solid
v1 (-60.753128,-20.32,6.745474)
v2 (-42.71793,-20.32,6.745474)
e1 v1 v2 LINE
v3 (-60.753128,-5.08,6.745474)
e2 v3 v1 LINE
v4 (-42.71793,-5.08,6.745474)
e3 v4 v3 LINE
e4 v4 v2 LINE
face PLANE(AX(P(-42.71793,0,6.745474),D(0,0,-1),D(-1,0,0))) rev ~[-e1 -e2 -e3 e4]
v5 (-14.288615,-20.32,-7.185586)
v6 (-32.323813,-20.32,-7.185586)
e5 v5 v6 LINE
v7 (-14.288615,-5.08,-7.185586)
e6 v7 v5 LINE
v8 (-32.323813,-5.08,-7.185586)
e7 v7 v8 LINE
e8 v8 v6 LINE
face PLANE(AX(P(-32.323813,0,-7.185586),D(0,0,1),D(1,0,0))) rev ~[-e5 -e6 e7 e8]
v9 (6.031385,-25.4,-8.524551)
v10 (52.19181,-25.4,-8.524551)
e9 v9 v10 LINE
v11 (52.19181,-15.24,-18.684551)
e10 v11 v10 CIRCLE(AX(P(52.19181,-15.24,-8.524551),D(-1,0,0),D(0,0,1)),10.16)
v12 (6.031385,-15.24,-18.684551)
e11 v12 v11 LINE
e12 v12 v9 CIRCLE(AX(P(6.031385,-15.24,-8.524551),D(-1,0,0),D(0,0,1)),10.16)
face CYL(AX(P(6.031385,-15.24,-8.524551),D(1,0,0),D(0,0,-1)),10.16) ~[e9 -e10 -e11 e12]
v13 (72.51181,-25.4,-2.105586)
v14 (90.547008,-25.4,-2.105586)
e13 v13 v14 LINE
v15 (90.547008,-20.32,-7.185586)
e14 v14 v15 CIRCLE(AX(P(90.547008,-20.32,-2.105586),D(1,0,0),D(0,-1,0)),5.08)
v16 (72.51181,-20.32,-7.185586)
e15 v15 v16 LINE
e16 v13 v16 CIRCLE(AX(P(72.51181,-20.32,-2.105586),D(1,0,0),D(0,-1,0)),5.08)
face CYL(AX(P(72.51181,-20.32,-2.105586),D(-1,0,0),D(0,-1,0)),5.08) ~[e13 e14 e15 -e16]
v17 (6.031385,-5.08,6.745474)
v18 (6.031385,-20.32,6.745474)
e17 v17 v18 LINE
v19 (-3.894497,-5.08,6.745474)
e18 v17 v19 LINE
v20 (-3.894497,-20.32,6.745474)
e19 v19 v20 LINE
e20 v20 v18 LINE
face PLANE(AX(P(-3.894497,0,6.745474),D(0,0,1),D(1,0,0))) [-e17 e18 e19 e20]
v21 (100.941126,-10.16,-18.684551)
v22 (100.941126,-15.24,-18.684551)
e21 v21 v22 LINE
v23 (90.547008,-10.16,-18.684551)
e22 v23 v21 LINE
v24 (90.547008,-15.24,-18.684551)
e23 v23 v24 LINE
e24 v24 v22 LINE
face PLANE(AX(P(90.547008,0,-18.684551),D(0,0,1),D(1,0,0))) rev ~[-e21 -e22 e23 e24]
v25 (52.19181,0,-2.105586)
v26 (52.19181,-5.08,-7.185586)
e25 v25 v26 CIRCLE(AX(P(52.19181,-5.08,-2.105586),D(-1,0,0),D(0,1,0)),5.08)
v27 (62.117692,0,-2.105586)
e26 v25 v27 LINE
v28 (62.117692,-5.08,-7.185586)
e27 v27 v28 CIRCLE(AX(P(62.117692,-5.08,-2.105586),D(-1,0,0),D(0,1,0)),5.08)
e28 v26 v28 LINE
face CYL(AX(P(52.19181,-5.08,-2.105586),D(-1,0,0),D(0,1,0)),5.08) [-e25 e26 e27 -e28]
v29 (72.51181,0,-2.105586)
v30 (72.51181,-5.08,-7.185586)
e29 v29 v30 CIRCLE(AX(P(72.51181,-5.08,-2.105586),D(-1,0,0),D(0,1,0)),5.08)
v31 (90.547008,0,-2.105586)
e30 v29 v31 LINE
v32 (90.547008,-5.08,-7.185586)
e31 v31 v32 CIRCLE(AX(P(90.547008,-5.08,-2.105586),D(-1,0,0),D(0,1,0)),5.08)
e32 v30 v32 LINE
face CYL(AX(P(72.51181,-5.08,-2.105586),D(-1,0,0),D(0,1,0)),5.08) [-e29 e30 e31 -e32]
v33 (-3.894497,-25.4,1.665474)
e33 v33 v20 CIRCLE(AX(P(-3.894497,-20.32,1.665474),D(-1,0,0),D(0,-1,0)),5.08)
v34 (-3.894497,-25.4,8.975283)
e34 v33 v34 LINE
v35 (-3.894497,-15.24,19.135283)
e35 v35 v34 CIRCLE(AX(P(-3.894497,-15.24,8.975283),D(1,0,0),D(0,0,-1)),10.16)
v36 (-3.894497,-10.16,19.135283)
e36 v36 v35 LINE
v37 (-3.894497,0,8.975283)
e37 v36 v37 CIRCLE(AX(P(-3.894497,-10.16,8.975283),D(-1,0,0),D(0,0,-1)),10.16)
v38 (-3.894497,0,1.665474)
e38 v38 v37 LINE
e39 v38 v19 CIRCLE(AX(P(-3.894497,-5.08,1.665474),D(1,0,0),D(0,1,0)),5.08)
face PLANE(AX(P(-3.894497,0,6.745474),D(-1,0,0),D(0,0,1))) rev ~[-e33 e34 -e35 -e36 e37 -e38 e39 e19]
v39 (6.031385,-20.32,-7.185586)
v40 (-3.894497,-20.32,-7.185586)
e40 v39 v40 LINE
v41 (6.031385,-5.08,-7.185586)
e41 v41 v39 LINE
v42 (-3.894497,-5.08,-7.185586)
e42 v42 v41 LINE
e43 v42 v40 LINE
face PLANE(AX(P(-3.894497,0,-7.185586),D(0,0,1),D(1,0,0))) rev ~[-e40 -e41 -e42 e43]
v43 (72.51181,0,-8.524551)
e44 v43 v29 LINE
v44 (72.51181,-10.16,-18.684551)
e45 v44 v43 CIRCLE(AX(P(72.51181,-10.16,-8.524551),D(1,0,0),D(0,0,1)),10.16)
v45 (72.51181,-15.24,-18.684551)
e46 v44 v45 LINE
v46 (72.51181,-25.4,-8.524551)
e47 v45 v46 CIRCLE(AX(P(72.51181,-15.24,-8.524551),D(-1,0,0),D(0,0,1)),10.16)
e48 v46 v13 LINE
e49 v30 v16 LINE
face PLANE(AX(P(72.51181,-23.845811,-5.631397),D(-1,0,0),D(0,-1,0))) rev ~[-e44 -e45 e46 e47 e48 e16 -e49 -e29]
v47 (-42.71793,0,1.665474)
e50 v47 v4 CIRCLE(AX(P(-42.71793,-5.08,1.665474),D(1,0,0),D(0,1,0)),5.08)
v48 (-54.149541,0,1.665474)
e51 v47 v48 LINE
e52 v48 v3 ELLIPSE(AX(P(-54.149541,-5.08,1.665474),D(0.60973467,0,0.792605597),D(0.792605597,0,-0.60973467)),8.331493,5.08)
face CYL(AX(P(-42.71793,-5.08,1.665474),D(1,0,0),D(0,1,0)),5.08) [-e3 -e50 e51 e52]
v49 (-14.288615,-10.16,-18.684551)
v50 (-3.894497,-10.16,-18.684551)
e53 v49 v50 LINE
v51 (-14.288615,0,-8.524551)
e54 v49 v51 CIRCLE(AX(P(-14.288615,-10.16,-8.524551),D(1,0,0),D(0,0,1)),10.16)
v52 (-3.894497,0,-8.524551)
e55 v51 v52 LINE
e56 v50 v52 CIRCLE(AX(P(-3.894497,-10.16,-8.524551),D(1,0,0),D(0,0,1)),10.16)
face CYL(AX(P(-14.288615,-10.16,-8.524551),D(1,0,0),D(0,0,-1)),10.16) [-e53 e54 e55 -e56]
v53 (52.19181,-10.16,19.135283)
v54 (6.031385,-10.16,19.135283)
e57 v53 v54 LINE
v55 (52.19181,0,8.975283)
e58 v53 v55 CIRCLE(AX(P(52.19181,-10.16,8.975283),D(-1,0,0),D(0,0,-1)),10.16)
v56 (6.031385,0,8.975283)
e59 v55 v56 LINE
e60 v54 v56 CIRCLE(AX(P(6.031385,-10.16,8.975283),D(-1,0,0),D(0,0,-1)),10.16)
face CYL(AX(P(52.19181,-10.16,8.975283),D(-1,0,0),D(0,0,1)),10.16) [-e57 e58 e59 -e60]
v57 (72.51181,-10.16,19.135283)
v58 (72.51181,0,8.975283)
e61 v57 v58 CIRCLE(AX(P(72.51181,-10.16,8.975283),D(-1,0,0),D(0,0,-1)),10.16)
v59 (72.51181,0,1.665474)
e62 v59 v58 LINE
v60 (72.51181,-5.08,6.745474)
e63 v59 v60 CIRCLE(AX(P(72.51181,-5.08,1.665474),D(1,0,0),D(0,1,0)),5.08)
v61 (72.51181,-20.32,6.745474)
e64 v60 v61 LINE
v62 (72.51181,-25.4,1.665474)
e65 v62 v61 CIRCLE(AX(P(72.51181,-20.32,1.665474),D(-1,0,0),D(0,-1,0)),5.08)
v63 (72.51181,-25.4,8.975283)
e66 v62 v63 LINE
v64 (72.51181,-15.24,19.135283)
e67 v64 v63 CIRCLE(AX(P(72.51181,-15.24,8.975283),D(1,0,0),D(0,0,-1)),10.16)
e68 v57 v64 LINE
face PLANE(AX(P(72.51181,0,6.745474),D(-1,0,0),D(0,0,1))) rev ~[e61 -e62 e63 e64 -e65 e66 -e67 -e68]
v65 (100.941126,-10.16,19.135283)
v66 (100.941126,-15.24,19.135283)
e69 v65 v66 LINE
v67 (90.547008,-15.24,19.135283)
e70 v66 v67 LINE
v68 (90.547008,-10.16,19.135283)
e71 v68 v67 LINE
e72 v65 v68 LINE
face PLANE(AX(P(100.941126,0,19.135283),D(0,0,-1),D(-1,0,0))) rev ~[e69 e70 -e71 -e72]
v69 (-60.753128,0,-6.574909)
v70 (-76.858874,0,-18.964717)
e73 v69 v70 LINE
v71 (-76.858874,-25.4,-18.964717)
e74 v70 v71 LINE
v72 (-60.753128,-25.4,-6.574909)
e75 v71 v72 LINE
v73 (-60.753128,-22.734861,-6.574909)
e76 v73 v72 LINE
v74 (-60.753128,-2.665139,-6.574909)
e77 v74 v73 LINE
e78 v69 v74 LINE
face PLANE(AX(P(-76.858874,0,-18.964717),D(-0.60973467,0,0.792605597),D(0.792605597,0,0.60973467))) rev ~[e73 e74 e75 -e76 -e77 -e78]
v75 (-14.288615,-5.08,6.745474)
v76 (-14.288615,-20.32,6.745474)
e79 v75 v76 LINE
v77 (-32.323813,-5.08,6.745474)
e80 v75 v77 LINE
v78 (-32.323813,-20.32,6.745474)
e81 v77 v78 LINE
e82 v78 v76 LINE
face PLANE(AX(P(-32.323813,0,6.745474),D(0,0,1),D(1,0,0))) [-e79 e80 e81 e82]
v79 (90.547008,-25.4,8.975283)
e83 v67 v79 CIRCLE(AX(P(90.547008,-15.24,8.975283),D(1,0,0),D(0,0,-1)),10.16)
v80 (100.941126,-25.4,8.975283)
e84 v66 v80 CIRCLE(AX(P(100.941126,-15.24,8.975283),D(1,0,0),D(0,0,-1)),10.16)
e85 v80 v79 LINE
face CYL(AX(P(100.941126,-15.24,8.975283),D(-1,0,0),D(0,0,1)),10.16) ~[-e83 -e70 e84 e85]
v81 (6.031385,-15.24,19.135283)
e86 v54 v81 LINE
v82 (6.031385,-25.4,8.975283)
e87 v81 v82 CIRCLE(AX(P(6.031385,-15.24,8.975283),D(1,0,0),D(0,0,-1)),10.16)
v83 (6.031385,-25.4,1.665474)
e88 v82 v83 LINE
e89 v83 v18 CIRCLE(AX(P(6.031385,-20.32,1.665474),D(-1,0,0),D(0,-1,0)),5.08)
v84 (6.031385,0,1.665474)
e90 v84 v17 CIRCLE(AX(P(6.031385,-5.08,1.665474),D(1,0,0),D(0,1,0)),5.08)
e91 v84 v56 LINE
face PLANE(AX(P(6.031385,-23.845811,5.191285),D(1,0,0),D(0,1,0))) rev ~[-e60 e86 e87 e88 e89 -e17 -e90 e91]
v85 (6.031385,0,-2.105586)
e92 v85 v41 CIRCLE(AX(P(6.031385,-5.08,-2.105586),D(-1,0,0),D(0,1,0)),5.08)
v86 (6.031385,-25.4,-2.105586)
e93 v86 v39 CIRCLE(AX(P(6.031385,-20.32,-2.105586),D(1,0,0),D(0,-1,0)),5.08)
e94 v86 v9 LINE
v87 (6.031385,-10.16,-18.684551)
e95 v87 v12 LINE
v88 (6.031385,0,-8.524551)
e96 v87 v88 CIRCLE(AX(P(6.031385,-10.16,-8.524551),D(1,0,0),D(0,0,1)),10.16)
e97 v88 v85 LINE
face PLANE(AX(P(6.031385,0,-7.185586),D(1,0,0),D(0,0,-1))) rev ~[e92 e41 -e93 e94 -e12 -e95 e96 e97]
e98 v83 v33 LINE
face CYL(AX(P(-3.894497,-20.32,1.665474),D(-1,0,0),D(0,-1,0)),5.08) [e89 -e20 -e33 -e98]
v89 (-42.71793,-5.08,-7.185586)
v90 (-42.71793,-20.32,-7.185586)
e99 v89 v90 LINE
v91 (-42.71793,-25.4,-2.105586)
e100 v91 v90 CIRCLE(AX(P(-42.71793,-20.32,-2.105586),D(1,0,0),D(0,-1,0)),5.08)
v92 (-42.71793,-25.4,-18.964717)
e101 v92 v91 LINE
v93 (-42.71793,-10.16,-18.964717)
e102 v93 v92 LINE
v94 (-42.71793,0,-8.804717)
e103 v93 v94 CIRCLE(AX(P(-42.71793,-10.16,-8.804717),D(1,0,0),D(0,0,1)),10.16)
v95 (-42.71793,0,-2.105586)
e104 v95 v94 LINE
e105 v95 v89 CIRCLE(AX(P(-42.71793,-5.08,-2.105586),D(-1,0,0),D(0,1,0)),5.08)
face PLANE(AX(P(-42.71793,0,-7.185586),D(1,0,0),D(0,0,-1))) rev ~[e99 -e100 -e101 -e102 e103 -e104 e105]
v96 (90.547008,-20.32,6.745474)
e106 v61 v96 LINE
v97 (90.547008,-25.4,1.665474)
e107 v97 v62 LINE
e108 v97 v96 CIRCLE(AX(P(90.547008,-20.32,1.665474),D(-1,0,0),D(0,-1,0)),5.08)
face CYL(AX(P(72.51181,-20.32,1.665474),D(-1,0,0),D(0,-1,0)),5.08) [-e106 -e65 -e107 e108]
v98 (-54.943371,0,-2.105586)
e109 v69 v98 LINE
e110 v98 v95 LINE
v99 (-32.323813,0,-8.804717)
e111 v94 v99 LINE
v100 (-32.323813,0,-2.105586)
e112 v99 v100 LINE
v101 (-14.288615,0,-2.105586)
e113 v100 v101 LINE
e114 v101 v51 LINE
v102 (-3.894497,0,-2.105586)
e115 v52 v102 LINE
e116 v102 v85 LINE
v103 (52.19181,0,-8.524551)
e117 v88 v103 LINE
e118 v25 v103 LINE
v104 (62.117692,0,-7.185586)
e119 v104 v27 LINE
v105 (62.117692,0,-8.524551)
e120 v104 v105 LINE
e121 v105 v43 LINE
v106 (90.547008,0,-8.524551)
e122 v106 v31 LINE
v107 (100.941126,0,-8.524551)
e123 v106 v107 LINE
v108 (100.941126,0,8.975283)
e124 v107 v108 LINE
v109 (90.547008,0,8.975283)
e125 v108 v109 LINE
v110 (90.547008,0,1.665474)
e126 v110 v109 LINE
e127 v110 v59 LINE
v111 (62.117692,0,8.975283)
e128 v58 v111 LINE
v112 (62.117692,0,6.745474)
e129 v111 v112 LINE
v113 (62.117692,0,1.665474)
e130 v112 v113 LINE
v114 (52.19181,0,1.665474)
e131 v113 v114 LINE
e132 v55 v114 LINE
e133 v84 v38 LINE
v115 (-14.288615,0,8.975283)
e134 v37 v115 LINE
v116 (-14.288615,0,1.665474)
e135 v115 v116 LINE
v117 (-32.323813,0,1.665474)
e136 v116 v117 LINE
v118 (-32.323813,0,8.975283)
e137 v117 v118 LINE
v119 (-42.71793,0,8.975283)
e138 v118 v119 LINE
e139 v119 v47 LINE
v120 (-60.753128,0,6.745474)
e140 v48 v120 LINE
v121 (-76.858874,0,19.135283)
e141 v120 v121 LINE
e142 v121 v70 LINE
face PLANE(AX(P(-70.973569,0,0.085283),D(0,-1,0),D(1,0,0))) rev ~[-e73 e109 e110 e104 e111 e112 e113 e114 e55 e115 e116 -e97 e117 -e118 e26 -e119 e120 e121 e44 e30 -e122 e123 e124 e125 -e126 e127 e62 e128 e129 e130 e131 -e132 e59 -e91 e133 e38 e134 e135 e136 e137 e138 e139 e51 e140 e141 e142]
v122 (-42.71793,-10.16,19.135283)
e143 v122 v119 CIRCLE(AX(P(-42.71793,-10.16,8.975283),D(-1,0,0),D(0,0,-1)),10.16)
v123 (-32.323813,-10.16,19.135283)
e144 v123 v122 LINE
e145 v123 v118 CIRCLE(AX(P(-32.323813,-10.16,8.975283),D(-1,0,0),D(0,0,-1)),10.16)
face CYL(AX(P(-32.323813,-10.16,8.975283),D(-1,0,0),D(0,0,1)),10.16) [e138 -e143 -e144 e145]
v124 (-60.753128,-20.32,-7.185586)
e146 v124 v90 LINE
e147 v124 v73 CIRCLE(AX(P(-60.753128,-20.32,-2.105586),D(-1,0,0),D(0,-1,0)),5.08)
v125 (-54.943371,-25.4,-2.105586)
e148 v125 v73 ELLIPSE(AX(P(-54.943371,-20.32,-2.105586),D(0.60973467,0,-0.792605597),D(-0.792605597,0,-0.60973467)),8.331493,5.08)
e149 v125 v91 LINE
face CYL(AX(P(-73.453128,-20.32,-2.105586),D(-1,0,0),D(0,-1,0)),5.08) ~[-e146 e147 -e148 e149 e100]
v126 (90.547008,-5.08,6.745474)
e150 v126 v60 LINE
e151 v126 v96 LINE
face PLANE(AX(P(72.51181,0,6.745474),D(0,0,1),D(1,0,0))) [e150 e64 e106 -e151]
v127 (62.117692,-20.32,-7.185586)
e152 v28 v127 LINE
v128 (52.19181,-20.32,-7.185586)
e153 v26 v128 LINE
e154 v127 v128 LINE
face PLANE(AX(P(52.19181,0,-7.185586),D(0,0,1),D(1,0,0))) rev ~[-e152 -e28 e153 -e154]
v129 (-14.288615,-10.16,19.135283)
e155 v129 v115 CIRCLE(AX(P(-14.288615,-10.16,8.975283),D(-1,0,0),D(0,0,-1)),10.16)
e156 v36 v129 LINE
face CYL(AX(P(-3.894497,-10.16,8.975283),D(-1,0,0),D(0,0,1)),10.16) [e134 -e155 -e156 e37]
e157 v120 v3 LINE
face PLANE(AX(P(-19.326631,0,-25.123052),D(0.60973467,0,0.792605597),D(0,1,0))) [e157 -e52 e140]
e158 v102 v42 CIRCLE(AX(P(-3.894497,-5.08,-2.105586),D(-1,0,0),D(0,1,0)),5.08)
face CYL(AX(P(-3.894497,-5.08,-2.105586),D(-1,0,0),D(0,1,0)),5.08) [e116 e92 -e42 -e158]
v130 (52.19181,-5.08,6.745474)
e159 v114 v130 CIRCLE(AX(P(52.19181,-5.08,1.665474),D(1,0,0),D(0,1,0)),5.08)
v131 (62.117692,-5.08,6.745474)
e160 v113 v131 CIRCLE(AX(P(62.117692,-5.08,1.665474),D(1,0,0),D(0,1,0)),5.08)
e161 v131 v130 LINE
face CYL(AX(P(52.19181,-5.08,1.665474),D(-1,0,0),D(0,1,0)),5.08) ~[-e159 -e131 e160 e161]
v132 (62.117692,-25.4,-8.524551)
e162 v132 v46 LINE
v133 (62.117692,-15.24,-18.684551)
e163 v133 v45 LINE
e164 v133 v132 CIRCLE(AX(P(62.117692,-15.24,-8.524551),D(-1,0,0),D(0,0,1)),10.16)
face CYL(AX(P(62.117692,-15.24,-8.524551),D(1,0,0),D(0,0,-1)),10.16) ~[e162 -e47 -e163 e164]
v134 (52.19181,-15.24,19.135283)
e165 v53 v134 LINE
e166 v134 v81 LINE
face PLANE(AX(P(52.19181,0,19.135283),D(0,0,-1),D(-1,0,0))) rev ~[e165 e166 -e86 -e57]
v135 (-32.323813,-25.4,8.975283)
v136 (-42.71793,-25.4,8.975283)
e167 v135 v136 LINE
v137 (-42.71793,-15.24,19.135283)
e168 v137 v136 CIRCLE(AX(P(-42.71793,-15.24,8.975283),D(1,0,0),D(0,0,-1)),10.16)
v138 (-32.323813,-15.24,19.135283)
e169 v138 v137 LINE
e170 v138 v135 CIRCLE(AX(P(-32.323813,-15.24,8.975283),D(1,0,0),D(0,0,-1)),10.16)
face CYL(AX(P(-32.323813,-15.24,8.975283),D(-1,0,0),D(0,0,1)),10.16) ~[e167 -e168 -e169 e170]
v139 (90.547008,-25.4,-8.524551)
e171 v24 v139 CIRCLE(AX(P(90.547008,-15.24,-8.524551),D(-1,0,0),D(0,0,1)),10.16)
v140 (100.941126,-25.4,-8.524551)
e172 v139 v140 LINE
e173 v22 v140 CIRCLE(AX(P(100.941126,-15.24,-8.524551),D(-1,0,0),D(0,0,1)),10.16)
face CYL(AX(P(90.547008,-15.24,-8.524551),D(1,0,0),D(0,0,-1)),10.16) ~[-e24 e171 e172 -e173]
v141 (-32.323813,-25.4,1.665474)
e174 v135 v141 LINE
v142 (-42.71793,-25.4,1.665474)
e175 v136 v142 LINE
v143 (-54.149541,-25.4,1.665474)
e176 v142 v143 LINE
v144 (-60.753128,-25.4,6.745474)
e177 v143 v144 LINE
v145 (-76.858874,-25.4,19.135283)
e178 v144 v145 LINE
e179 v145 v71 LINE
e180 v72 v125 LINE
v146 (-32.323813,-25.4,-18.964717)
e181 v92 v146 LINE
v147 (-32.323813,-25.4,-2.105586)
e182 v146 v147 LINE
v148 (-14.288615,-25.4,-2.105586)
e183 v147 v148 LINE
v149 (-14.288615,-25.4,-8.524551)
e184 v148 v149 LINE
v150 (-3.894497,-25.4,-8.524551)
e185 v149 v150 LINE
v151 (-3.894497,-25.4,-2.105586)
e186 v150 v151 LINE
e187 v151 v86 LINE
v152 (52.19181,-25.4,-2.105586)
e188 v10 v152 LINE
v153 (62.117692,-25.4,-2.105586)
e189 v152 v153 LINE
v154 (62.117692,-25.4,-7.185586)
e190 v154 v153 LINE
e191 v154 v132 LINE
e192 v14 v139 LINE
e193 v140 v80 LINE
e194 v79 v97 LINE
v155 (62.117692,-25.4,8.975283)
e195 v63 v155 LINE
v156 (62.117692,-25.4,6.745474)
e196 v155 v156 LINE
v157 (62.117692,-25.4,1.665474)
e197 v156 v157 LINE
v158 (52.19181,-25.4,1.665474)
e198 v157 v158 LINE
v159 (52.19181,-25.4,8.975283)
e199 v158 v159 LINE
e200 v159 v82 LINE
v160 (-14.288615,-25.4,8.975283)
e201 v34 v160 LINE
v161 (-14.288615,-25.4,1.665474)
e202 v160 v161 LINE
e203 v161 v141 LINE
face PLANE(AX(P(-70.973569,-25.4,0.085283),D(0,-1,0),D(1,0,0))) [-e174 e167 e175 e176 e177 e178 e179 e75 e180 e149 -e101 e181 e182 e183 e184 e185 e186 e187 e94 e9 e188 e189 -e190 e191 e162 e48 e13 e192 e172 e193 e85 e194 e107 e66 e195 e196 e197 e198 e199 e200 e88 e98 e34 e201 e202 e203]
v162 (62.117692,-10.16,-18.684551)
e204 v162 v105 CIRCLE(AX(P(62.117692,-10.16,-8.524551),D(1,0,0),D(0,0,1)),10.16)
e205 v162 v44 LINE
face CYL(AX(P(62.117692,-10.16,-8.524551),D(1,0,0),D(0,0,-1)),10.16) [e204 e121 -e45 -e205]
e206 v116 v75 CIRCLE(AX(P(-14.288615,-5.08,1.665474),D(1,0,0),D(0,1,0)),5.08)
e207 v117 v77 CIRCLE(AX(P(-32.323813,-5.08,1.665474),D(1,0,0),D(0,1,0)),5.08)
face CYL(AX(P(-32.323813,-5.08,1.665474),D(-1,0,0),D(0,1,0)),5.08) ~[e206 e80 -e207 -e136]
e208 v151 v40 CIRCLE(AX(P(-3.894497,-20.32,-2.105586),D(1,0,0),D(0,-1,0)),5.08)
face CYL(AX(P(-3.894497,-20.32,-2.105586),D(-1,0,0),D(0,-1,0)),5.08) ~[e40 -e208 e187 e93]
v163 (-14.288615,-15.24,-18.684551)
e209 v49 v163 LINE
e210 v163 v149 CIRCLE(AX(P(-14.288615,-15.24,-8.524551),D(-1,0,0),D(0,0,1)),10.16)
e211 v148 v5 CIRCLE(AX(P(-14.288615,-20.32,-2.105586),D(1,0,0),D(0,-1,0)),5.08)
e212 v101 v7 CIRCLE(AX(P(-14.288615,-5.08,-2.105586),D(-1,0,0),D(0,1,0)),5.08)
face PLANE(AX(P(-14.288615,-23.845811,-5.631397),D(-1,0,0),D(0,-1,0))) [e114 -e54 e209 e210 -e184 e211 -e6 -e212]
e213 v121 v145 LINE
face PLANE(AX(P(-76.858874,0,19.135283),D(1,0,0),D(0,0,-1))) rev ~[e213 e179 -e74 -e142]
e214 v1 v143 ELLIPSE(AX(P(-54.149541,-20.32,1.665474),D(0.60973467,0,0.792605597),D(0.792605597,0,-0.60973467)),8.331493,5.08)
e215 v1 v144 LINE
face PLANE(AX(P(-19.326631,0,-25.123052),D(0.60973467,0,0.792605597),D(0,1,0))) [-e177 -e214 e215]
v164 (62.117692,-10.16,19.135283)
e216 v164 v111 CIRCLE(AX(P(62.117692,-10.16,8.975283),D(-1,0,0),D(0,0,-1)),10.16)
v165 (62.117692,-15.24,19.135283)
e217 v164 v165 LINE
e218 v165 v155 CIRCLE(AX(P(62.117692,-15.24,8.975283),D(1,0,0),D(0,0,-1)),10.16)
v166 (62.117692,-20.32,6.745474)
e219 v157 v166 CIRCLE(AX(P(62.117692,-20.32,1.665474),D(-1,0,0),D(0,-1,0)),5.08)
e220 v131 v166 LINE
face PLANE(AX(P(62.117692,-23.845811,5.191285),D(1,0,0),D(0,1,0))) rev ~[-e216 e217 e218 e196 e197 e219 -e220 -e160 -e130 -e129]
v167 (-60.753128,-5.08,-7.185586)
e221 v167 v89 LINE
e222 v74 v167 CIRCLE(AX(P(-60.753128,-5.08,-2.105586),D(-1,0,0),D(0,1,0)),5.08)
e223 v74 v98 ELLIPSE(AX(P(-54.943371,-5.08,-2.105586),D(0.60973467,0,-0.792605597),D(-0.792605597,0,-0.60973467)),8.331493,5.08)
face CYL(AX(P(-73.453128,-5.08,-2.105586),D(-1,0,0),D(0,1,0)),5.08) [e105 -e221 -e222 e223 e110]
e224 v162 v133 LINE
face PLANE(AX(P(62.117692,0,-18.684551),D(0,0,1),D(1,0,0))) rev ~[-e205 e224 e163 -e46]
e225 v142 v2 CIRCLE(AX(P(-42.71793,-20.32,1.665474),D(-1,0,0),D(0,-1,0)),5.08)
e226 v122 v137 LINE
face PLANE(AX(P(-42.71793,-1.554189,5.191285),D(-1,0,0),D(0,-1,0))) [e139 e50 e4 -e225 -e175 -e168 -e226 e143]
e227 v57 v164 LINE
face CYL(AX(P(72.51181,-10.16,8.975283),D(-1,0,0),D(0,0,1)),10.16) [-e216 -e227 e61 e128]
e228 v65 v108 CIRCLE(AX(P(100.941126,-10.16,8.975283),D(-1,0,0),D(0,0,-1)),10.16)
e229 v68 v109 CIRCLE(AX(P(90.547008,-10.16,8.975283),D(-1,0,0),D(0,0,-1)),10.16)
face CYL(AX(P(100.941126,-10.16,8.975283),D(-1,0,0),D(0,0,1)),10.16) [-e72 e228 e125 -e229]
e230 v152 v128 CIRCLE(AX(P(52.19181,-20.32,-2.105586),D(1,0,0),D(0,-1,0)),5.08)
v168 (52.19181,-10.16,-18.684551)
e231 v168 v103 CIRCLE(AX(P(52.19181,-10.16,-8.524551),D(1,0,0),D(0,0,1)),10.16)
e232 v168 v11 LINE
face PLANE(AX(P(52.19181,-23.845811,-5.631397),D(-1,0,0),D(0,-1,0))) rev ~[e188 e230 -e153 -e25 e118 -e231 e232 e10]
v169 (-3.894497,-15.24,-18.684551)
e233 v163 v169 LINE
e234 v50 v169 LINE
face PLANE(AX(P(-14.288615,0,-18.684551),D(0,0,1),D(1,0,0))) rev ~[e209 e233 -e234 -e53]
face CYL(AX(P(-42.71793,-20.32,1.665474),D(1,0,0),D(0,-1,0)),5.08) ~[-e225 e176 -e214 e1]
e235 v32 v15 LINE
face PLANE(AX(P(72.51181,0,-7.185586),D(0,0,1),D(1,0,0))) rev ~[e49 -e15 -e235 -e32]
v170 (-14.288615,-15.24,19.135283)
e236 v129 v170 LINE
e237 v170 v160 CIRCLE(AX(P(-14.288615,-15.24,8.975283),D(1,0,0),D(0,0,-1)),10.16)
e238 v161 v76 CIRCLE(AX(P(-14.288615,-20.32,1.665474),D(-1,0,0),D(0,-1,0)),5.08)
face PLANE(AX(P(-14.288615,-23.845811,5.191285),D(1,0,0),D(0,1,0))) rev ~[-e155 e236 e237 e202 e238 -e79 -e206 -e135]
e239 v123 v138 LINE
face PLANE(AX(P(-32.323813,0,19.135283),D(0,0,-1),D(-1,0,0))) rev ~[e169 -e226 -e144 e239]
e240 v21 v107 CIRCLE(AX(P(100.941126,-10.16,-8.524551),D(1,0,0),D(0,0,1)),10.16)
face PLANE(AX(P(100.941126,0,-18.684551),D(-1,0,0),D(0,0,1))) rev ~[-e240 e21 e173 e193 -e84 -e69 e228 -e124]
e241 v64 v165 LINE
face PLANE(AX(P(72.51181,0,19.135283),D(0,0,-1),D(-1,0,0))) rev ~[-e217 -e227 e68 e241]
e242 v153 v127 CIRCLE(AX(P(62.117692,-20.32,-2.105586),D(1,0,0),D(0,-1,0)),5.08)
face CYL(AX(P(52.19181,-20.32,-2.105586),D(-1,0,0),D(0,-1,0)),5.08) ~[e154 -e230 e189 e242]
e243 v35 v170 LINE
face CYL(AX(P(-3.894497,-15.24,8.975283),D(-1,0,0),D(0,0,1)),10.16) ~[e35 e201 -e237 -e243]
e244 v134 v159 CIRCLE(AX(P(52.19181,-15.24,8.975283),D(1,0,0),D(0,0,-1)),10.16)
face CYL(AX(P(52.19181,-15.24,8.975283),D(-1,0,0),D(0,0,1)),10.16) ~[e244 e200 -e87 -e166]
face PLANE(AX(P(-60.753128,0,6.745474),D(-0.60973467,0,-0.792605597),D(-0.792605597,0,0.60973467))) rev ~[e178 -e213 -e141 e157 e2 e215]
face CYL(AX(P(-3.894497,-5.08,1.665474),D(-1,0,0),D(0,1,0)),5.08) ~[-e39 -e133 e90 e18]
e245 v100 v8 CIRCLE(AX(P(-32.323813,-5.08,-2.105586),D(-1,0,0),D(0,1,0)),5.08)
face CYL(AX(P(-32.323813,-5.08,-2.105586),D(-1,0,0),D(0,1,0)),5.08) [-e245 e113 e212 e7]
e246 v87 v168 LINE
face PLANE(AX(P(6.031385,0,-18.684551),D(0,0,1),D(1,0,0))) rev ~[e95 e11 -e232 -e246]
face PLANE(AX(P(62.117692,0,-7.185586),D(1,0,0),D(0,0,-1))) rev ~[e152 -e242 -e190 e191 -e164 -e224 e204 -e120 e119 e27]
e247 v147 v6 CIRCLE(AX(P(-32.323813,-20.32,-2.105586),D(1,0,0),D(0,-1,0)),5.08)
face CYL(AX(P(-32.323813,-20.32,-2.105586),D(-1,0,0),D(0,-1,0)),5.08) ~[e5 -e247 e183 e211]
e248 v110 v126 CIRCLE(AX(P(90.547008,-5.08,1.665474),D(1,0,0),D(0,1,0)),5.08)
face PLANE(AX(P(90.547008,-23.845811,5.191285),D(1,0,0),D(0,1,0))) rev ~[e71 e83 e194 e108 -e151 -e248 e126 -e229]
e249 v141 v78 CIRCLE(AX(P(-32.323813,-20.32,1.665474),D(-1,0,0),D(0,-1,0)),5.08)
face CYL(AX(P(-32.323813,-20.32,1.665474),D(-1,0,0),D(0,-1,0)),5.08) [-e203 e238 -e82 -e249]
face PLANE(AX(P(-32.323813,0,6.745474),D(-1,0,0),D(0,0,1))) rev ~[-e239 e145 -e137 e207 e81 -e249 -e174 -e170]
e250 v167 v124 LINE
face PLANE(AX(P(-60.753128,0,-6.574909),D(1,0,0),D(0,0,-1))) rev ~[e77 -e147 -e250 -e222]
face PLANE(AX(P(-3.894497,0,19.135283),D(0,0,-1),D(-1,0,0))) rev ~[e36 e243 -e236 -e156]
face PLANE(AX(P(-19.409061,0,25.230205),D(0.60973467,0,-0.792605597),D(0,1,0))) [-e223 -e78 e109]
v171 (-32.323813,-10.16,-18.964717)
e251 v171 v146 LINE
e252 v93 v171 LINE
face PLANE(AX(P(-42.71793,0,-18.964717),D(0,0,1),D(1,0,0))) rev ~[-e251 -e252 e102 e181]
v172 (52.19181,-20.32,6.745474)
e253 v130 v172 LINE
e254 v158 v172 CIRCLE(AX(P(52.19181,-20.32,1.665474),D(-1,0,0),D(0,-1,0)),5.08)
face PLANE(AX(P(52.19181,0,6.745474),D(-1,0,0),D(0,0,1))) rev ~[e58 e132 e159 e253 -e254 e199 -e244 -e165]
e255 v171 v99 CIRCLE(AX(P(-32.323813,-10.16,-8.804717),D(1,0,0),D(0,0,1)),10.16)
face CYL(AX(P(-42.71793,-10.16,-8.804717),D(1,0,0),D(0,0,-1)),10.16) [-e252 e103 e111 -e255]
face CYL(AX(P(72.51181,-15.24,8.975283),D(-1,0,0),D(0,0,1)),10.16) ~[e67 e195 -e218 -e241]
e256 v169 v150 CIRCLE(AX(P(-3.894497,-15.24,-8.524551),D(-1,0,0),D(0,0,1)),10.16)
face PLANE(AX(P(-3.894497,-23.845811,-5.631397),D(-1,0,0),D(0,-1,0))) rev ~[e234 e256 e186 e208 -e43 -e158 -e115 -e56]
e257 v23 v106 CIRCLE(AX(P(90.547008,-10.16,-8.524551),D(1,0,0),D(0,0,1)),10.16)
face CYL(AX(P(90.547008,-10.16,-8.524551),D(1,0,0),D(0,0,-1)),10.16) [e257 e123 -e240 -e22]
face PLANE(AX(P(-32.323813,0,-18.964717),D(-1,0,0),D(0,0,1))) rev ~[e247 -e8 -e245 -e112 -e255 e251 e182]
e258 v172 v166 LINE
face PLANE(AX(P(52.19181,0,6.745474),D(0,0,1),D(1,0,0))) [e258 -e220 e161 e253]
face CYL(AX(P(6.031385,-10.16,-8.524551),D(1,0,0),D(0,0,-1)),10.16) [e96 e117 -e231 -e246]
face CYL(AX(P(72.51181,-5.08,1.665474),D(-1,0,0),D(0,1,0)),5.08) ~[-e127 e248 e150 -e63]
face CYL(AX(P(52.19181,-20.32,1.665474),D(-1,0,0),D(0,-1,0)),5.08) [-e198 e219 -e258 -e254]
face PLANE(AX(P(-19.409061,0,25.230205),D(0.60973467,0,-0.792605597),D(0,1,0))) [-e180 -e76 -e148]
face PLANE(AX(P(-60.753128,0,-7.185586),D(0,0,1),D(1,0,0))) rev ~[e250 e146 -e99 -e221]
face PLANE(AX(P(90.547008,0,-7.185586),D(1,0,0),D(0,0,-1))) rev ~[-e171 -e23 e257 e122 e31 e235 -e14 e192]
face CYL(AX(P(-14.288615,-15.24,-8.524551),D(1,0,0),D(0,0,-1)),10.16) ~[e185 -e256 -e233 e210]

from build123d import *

# Parameters (mm, degrees)
F0_W          = 18.0351980008
F0_H          = 13.9310602441
F0_W_2        = 9.9258822108
F1_DEPTH      = 25.4
F2_R          = 10.16
F3_T1_DEPTH   = 18.0351980008
F3_T3_DEPTH   = 9.9258822108
F3_T5_DEPTH   = 18.0351980008
F3_T7_DEPTH   = 9.9258822108
F3_T12_DEPTH  = 43.4351980008
F3_T17_DEPTH  = 30.7351980008
F3_T22_DEPTH  = 30.7351980008
F3_T27_DEPTH  = 43.4351980008
F3_T32_DEPTH  = 43.4351980008
F3_T37_DEPTH  = 30.7351980008
F3_T42_DEPTH  = 30.7351980008
F3_T47_DEPTH  = 43.4351980008
F3_T52_DEPTH  = 43.4351980008
F3_T57_DEPTH  = 43.4351980008
F3_T62_DEPTH  = 43.4351980008
F3_T67_DEPTH  = 43.4351980008
F3_T72_DEPTH  = 43.4351980008
F3_T77_DEPTH  = 43.4351980008
F3_T82_DEPTH  = 43.4351980008
F3_T87_DEPTH  = 43.4351980008
F3_T92_DEPTH  = 35.3258822108
F3_T97_DEPTH  = 35.3258822108
F3_T102_DEPTH = 35.3258822108
F3_T107_DEPTH = 35.3258822108
F3_T112_DEPTH = 43.4351980008
F3_T117_DEPTH = 43.4351980008
F3_T122_DEPTH = 43.4351980008
F3_T127_DEPTH = 43.4351980008
F3_T132_DEPTH = 35.3258822108
F3_T137_DEPTH = 35.3258822108
F3_T142_DEPTH = 35.3258822108
F3_T147_DEPTH = 35.3258822108


# Not quite as in the source:
# - a fillet or chamfer that OpenCascade refuses, or shapes differently, is made with other operations: its cross-section is extruded or revolved along the edge and cut away or added


with BuildPart() as f1:
    # F0 (on Front) → F1 (new body)
    with BuildSketch(Plane.XZ):
        Polygon((-60.7531283318, 6.7454743419), (-76.858874061, 19.1352828354), (-76.858874061, -18.9647171646), (-60.7531283318, -6.5749086711), align=None)
        Polygon((-42.717930331, 6.7454743419), (-60.7531283318, 6.7454743419), (-60.7531283318, -6.5749086711), (-60.7531283318, -7.1855859023), (-42.717930331, -7.1855859023), align=None)
        Polygon((-42.717930331, 19.1352828354), (-42.717930331, 6.7454743419), (-42.717930331, -7.1855859023), (-42.717930331, -18.9647171646), (-32.3238125419, -18.9647171646), (-32.3238125419, -7.1855859023), (-32.3238125419, 6.7454743419), (-32.3238125419, 19.1352828354), align=None)
        with Locations((-23.3062135415, -0.2200557802)):
            Rectangle(F0_W, F0_H)
        Polygon((-14.2886145411, 19.1352828354), (-14.2886145411, 6.7454743419), (-14.2886145411, -7.1855859023), (-14.2886145411, -18.6845511312), (-3.8944967519, -18.6845511312), (-3.8944967519, -7.1855859023), (-3.8944967519, 6.7454743419), (-3.8944967519, 19.1352828354), align=None)
        with Locations((1.0684443535, -0.2200557802)):
            Rectangle(F0_W_2, F0_H)
        Polygon((6.0313854589, 19.1352828354), (6.0313854589, 6.7454743419), (6.0313854589, -7.1855859023), (6.0313854589, -18.6845511312), (52.191810149, -18.6845511312), (52.191810149, -7.1855859023), (52.191810149, 6.7454743419), (52.191810149, 19.1352828354), align=None)
        with Locations((57.1547512544, -0.2200557802)):
            Rectangle(F0_W_2, F0_H)
        Polygon((62.1176923599, 19.1352828354), (62.1176923599, 6.7454743419), (62.1176923599, -7.1855859023), (62.1176923599, -18.6845511312), (72.511810149, -18.6845511312), (72.511810149, -7.1855859023), (72.511810149, 6.7454743419), (72.511810149, 19.1352828354), align=None)
        with Locations((81.5294091494, -0.2200557802)):
            Rectangle(F0_W, F0_H)
        Polygon((90.5470081498, 19.1352828354), (90.5470081498, 6.7454743419), (90.5470081498, -7.1855859023), (90.5470081498, -18.6845511312), (100.941125939, -18.6845511312), (100.941125939, 19.1352828354), align=None)
    extrude(amount=F1_DEPTH)

    # F2
    f2_edges = [f1.edges().sort_by_distance(p)[0] for p in [
        (67.314751, 0, -18.684551),
        (67.314751, -25.4, -18.684551),
        (95.744067, 0, -18.684551),
        (95.744067, -25.4, -18.684551),
        (95.744067, -25.4, 19.135283),
        (95.744067, 0, 19.135283),
        (67.314751, -25.4, 19.135283),
        (67.314751, 0, 19.135283),
        (29.111598, -25.4, 19.135283),
        (29.111598, 0, 19.135283),
        (29.111598, -25.4, -18.684551),
        (29.111598, 0, -18.684551),
        (-9.091556, 0, 19.135283),
        (-9.091556, 0, -18.684551),
        (-9.091556, -25.4, 19.135283),
        (-9.091556, -25.4, -18.684551),
        (-37.520871, 0, 19.135283),
        (-37.520871, 0, -18.964717),
        (-37.520871, -25.4, 19.135283),
    ]]
    fillet(f2_edges, radius=F2_R)

    # F3: fillet of radius 5.08 on 20 edges, made by hand

    # F3_s2 → F3_t1 (cut)
    with BuildSketch(Plane.YZ.offset(-32.3238125419)):
        with BuildLine():
            ThreePointArc((0, 1.6654743419), (-1.4878975516, 5.2575767903), (-5.08, 6.7454743419))
            Line((-5.08, 6.7454743419), (0, 6.7454743419))
            Line((0, 6.7454743419), (0, 1.6654743419))
        make_face()
        with BuildLine():
            ThreePointArc((0, -2.1055859023), (-1.4878975516, -5.6976883507), (-5.08, -7.1855859023))
            Line((-5.08, -7.1855859023), (0, -7.1855859023))
            Line((0, -7.1855859023), (0, -2.1055859023))
        make_face()
        with BuildLine():
            ThreePointArc((-25.4, 1.6654743419), (-23.9121024484, 5.2575767903), (-20.32, 6.7454743419))
            Line((-20.32, 6.7454743419), (-25.4, 6.7454743419))
            Line((-25.4, 6.7454743419), (-25.4, 1.6654743419))
        make_face()
        with BuildLine():
            ThreePointArc((-25.4, -2.1055859023), (-23.9121024484, -5.6976883507), (-20.32, -7.1855859023))
            Line((-20.32, -7.1855859023), (-25.4, -7.1855859023))
            Line((-25.4, -7.1855859023), (-25.4, -2.1055859023))
        make_face()
    extrude(amount=F3_T1_DEPTH, mode=Mode.SUBTRACT)

    # F3_s4 → F3_t3 (cut)
    with BuildSketch(Plane.YZ.offset(-3.8944967519)):
        with BuildLine():
            ThreePointArc((-25.4, 1.6654743419), (-23.9121024484, 5.2575767903), (-20.32, 6.7454743419))
            Line((-20.32, 6.7454743419), (-25.4, 6.7454743419))
            Line((-25.4, 6.7454743419), (-25.4, 1.6654743419))
        make_face()
        with BuildLine():
            ThreePointArc((-25.4, -2.1055859023), (-23.9121024484, -5.6976883507), (-20.32, -7.1855859023))
            Line((-20.32, -7.1855859023), (-25.4, -7.1855859023))
            Line((-25.4, -7.1855859023), (-25.4, -2.1055859023))
        make_face()
        with BuildLine():
            ThreePointArc((0, 1.6654743419), (-1.4878975516, 5.2575767903), (-5.08, 6.7454743419))
            Line((-5.08, 6.7454743419), (0, 6.7454743419))
            Line((0, 6.7454743419), (0, 1.6654743419))
        make_face()
        with BuildLine():
            ThreePointArc((0, -2.1055859023), (-1.4878975516, -5.6976883507), (-5.08, -7.1855859023))
            Line((-5.08, -7.1855859023), (0, -7.1855859023))
            Line((0, -7.1855859023), (0, -2.1055859023))
        make_face()
    extrude(amount=F3_T3_DEPTH, mode=Mode.SUBTRACT)

    # F3_s6 → F3_t5 (cut)
    with BuildSketch(Plane.YZ.offset(72.511810149)):
        with BuildLine():
            ThreePointArc((0, 1.6654743419), (-1.4878975516, 5.2575767903), (-5.08, 6.7454743419))
            Line((-5.08, 6.7454743419), (0, 6.7454743419))
            Line((0, 6.7454743419), (0, 1.6654743419))
        make_face()
        with BuildLine():
            ThreePointArc((-25.4, 1.6654743419), (-23.9121024484, 5.2575767903), (-20.32, 6.7454743419))
            Line((-20.32, 6.7454743419), (-25.4, 6.7454743419))
            Line((-25.4, 6.7454743419), (-25.4, 1.6654743419))
        make_face()
        with BuildLine():
            ThreePointArc((-25.4, -2.1055859023), (-23.9121024484, -5.6976883507), (-20.32, -7.1855859023))
            Line((-20.32, -7.1855859023), (-25.4, -7.1855859023))
            Line((-25.4, -7.1855859023), (-25.4, -2.1055859023))
        make_face()
        with BuildLine():
            ThreePointArc((0, -2.1055859023), (-1.4878975516, -5.6976883507), (-5.08, -7.1855859023))
            Line((-5.08, -7.1855859023), (0, -7.1855859023))
            Line((0, -7.1855859023), (0, -2.1055859023))
        make_face()
    extrude(amount=F3_T5_DEPTH, mode=Mode.SUBTRACT)

    # F3_s8 → F3_t7 (cut)
    with BuildSketch(Plane.YZ.offset(52.191810149)):
        with BuildLine():
            ThreePointArc((0, 1.6654743419), (-1.4878975516, 5.2575767903), (-5.08, 6.7454743419))
            Line((-5.08, 6.7454743419), (0, 6.7454743419))
            Line((0, 6.7454743419), (0, 1.6654743419))
        make_face()
        with BuildLine():
            ThreePointArc((-25.4, 1.6654743419), (-23.9121024484, 5.2575767903), (-20.32, 6.7454743419))
            Line((-20.32, 6.7454743419), (-25.4, 6.7454743419))
            Line((-25.4, 6.7454743419), (-25.4, 1.6654743419))
        make_face()
        with BuildLine():
            ThreePointArc((0, -2.1055859023), (-1.4878975516, -5.6976883507), (-5.08, -7.1855859023))
            Line((-5.08, -7.1855859023), (0, -7.1855859023))
            Line((0, -7.1855859023), (0, -2.1055859023))
        make_face()
        with BuildLine():
            ThreePointArc((-25.4, -2.1055859023), (-23.9121024484, -5.6976883507), (-20.32, -7.1855859023))
            Line((-20.32, -7.1855859023), (-25.4, -7.1855859023))
            Line((-25.4, -7.1855859023), (-25.4, -2.1055859023))
        make_face()
    extrude(amount=F3_T7_DEPTH, mode=Mode.SUBTRACT)


with BuildPart() as f3_tool10:
    # F3_s11 → F3_t12 (new body)
    with BuildSketch(Plane.YZ.offset(-30.017930331)):
        with BuildLine():
            ThreePointArc((-25.4, 1.6654743419), (-23.9121024484, 5.2575767903), (-20.32, 6.7454743419))
            Line((-20.32, 6.7454743419), (-25.4, 6.7454743419))
            Line((-25.4, 6.7454743419), (-25.4, 1.6654743419))
        make_face()
    extrude(amount=-F3_T12_DEPTH)

    split(bisect_by=Plane.YZ.offset(-32.3238125419), keep=Keep.TOP)


with BuildPart() as f1_1:
    add(f1.part)

    # F3_t9: cut F3_tool10
    add(f3_tool10.part, mode=Mode.SUBTRACT)


with BuildPart() as f3_tool15:
    # F3_s16 → F3_t17 (new body)
    with BuildSketch(Plane.YZ.offset(-42.717930331)):
        with BuildLine():
            ThreePointArc((-25.4, 1.6654743419), (-23.9121024484, 5.2575767903), (-20.32, 6.7454743419))
            Line((-20.32, 6.7454743419), (-25.4, 6.7454743419))
            Line((-25.4, 6.7454743419), (-25.4, 1.6654743419))
        make_face()
    extrude(amount=-F3_T17_DEPTH)

    split(bisect_by=Plane(origin=(-19.3266305302, 0, -25.1230515214), x_dir=(0, 1, 0), z_dir=(0.60973467, 0, 0.7926055969)), keep=Keep.TOP)


with BuildPart() as f1_2:
    add(f1_1.part)

    # F3_t14: cut F3_tool15
    add(f3_tool15.part, mode=Mode.SUBTRACT)


with BuildPart() as f3_tool20:
    # F3_s21 → F3_t22 (new body)
    with BuildSketch(Plane.YZ.offset(-73.4531283318)):
        with BuildLine():
            ThreePointArc((-25.4, -2.1055859023), (-23.9121024484, -5.6976883507), (-20.32, -7.1855859023))
            Line((-20.32, -7.1855859023), (-25.4, -7.1855859023))
            Line((-25.4, -7.1855859023), (-25.4, -2.1055859023))
        make_face()
    extrude(amount=F3_T22_DEPTH)

    split(bisect_by=Plane(origin=(-19.4090613561, 0, 25.2302049066), x_dir=(0, 1, 0), z_dir=(0.60973467, 0, -0.7926055969)), keep=Keep.TOP)


with BuildPart() as f1_3:
    add(f1_2.part)

    # F3_t19: cut F3_tool20
    add(f3_tool20.part, mode=Mode.SUBTRACT)


with BuildPart() as f3_tool25:
    # F3_s26 → F3_t27 (new body)
    with BuildSketch(Plane.YZ.offset(-73.4531283318)):
        with BuildLine():
            ThreePointArc((-25.4, -2.1055859023), (-23.9121024484, -5.6976883507), (-20.32, -7.1855859023))
            Line((-20.32, -7.1855859023), (-25.4, -7.1855859023))
            Line((-25.4, -7.1855859023), (-25.4, -2.1055859023))
        make_face()
    extrude(amount=F3_T27_DEPTH)

    split(bisect_by=Plane.YZ.offset(-32.3238125419), keep=Keep.TOP)


with BuildPart() as f1_4:
    add(f1_3.part)

    # F3_t24: cut F3_tool25
    add(f3_tool25.part, mode=Mode.SUBTRACT)


with BuildPart() as f3_tool30:
    # F3_s31 → F3_t32 (new body)
    with BuildSketch(Plane.YZ.offset(-30.017930331)):
        with BuildLine():
            ThreePointArc((0, 1.6654743419), (-1.4878975516, 5.2575767903), (-5.08, 6.7454743419))
            Line((-5.08, 6.7454743419), (0, 6.7454743419))
            Line((0, 6.7454743419), (0, 1.6654743419))
        make_face()
    extrude(amount=-F3_T32_DEPTH)

    split(bisect_by=Plane.YZ.offset(-32.3238125419), keep=Keep.TOP)


with BuildPart() as f1_5:
    add(f1_4.part)

    # F3_t29: cut F3_tool30
    add(f3_tool30.part, mode=Mode.SUBTRACT)


with BuildPart() as f3_tool35:
    # F3_s36 → F3_t37 (new body)
    with BuildSketch(Plane.YZ.offset(-42.717930331)):
        with BuildLine():
            ThreePointArc((0, 1.6654743419), (-1.4878975516, 5.2575767903), (-5.08, 6.7454743419))
            Line((-5.08, 6.7454743419), (0, 6.7454743419))
            Line((0, 6.7454743419), (0, 1.6654743419))
        make_face()
    extrude(amount=-F3_T37_DEPTH)

    split(bisect_by=Plane(origin=(-19.3266305302, 0, -25.1230515214), x_dir=(0, 1, 0), z_dir=(0.60973467, 0, 0.7926055969)), keep=Keep.TOP)


with BuildPart() as f1_6:
    add(f1_5.part)

    # F3_t34: cut F3_tool35
    add(f3_tool35.part, mode=Mode.SUBTRACT)


with BuildPart() as f3_tool40:
    # F3_s41 → F3_t42 (new body)
    with BuildSketch(Plane.YZ.offset(-73.4531283318)):
        with BuildLine():
            ThreePointArc((0, -2.1055859023), (-1.4878975516, -5.6976883507), (-5.08, -7.1855859023))
            Line((-5.08, -7.1855859023), (0, -7.1855859023))
            Line((0, -7.1855859023), (0, -2.1055859023))
        make_face()
    extrude(amount=F3_T42_DEPTH)

    split(bisect_by=Plane(origin=(-19.4090613561, 0, 25.2302049066), x_dir=(0, 1, 0), z_dir=(0.60973467, 0, -0.7926055969)), keep=Keep.TOP)


with BuildPart() as f1_7:
    add(f1_6.part)

    # F3_t39: cut F3_tool40
    add(f3_tool40.part, mode=Mode.SUBTRACT)


with BuildPart() as f3_tool45:
    # F3_s46 → F3_t47 (new body)
    with BuildSketch(Plane.YZ.offset(-73.4531283318)):
        with BuildLine():
            ThreePointArc((0, -2.1055859023), (-1.4878975516, -5.6976883507), (-5.08, -7.1855859023))
            Line((-5.08, -7.1855859023), (0, -7.1855859023))
            Line((0, -7.1855859023), (0, -2.1055859023))
        make_face()
    extrude(amount=F3_T47_DEPTH)

    split(bisect_by=Plane.YZ.offset(-32.3238125419), keep=Keep.TOP)


with BuildPart() as f1_8:
    add(f1_7.part)

    # F3_t44: cut F3_tool45
    add(f3_tool45.part, mode=Mode.SUBTRACT)


with BuildPart() as f3_tool50:
    # F3_s51 → F3_t52 (new body)
    with BuildSketch(Plane.YZ.offset(-1.5886145411)):
        with BuildLine():
            ThreePointArc((0, 1.6654743419), (-1.4878975516, 5.2575767903), (-5.08, 6.7454743419))
            Line((-5.08, 6.7454743419), (0, 6.7454743419))
            Line((0, 6.7454743419), (0, 1.6654743419))
        make_face()
    extrude(amount=-F3_T52_DEPTH)

    split(bisect_by=Plane.YZ.offset(-3.8944967519), keep=Keep.TOP)


with BuildPart() as f1_9:
    add(f1_8.part)

    # F3_t49: cut F3_tool50
    add(f3_tool50.part, mode=Mode.SUBTRACT)


with BuildPart() as f3_tool55:
    # F3_s56 → F3_t57 (new body)
    with BuildSketch(Plane.YZ.offset(-1.5886145411)):
        with BuildLine():
            ThreePointArc((0, 1.6654743419), (-1.4878975516, 5.2575767903), (-5.08, 6.7454743419))
            Line((-5.08, 6.7454743419), (0, 6.7454743419))
            Line((0, 6.7454743419), (0, 1.6654743419))
        make_face()
    extrude(amount=-F3_T57_DEPTH)

    split(bisect_by=Plane.YZ.offset(-42.717930331), keep=Keep.BOTTOM)


with BuildPart() as f1_10:
    add(f1_9.part)

    # F3_t54: cut F3_tool55
    add(f3_tool55.part, mode=Mode.SUBTRACT)


with BuildPart() as f3_tool60:
    # F3_s61 → F3_t62 (new body)
    with BuildSketch(Plane.YZ.offset(-45.0238125419)):
        with BuildLine():
            ThreePointArc((0, -2.1055859023), (-1.4878975516, -5.6976883507), (-5.08, -7.1855859023))
            Line((-5.08, -7.1855859023), (0, -7.1855859023))
            Line((0, -7.1855859023), (0, -2.1055859023))
        make_face()
    extrude(amount=F3_T62_DEPTH)

    split(bisect_by=Plane.YZ.offset(-42.717930331), keep=Keep.BOTTOM)


with BuildPart() as f1_11:
    add(f1_10.part)

    # F3_t59: cut F3_tool60
    add(f3_tool60.part, mode=Mode.SUBTRACT)


with BuildPart() as f3_tool65:
    # F3_s66 → F3_t67 (new body)
    with BuildSketch(Plane.YZ.offset(-45.0238125419)):
        with BuildLine():
            ThreePointArc((0, -2.1055859023), (-1.4878975516, -5.6976883507), (-5.08, -7.1855859023))
            Line((-5.08, -7.1855859023), (0, -7.1855859023))
            Line((0, -7.1855859023), (0, -2.1055859023))
        make_face()
    extrude(amount=F3_T67_DEPTH)

    split(bisect_by=Plane.YZ.offset(-3.8944967519), keep=Keep.TOP)


with BuildPart() as f1_12:
    add(f1_11.part)

    # F3_t64: cut F3_tool65
    add(f3_tool65.part, mode=Mode.SUBTRACT)


with BuildPart() as f3_tool70:
    # F3_s71 → F3_t72 (new body)
    with BuildSketch(Plane.YZ.offset(-1.5886145411)):
        with BuildLine():
            ThreePointArc((-25.4, 1.6654743419), (-23.9121024484, 5.2575767903), (-20.32, 6.7454743419))
            Line((-20.32, 6.7454743419), (-25.4, 6.7454743419))
            Line((-25.4, 6.7454743419), (-25.4, 1.6654743419))
        make_face()
    extrude(amount=-F3_T72_DEPTH)

    split(bisect_by=Plane.YZ.offset(-3.8944967519), keep=Keep.TOP)


with BuildPart() as f1_13:
    add(f1_12.part)

    # F3_t69: cut F3_tool70
    add(f3_tool70.part, mode=Mode.SUBTRACT)


with BuildPart() as f3_tool75:
    # F3_s76 → F3_t77 (new body)
    with BuildSketch(Plane.YZ.offset(-1.5886145411)):
        with BuildLine():
            ThreePointArc((-25.4, 1.6654743419), (-23.9121024484, 5.2575767903), (-20.32, 6.7454743419))
            Line((-20.32, 6.7454743419), (-25.4, 6.7454743419))
            Line((-25.4, 6.7454743419), (-25.4, 1.6654743419))
        make_face()
    extrude(amount=-F3_T77_DEPTH)

    split(bisect_by=Plane.YZ.offset(-42.717930331), keep=Keep.BOTTOM)


with BuildPart() as f1_14:
    add(f1_13.part)

    # F3_t74: cut F3_tool75
    add(f3_tool75.part, mode=Mode.SUBTRACT)


with BuildPart() as f3_tool80:
    # F3_s81 → F3_t82 (new body)
    with BuildSketch(Plane.YZ.offset(-45.0238125419)):
        with BuildLine():
            ThreePointArc((-25.4, -2.1055859023), (-23.9121024484, -5.6976883507), (-20.32, -7.1855859023))
            Line((-20.32, -7.1855859023), (-25.4, -7.1855859023))
            Line((-25.4, -7.1855859023), (-25.4, -2.1055859023))
        make_face()
    extrude(amount=F3_T82_DEPTH)

    split(bisect_by=Plane.YZ.offset(-42.717930331), keep=Keep.BOTTOM)


with BuildPart() as f1_15:
    add(f1_14.part)

    # F3_t79: cut F3_tool80
    add(f3_tool80.part, mode=Mode.SUBTRACT)


with BuildPart() as f3_tool85:
    # F3_s86 → F3_t87 (new body)
    with BuildSketch(Plane.YZ.offset(-45.0238125419)):
        with BuildLine():
            ThreePointArc((-25.4, -2.1055859023), (-23.9121024484, -5.6976883507), (-20.32, -7.1855859023))
            Line((-20.32, -7.1855859023), (-25.4, -7.1855859023))
            Line((-25.4, -7.1855859023), (-25.4, -2.1055859023))
        make_face()
    extrude(amount=F3_T87_DEPTH)

    split(bisect_by=Plane.YZ.offset(-3.8944967519), keep=Keep.TOP)


with BuildPart() as f1_16:
    add(f1_15.part)

    # F3_t84: cut F3_tool85
    add(f3_tool85.part, mode=Mode.SUBTRACT)


with BuildPart() as f3_tool90:
    # F3_s91 → F3_t92 (new body)
    with BuildSketch(Plane.YZ.offset(18.7313854589)):
        with BuildLine():
            ThreePointArc((-25.4, 1.6654743419), (-23.9121024484, 5.2575767903), (-20.32, 6.7454743419))
            Line((-20.32, 6.7454743419), (-25.4, 6.7454743419))
            Line((-25.4, 6.7454743419), (-25.4, 1.6654743419))
        make_face()
    extrude(amount=-F3_T92_DEPTH)

    split(bisect_by=Plane.YZ.offset(-14.2886145411), keep=Keep.BOTTOM)


with BuildPart() as f1_17:
    add(f1_16.part)

    # F3_t89: cut F3_tool90
    add(f3_tool90.part, mode=Mode.SUBTRACT)


with BuildPart() as f3_tool95:
    # F3_s96 → F3_t97 (new body)
    with BuildSketch(Plane.YZ.offset(-16.5944967519)):
        with BuildLine():
            ThreePointArc((-25.4, -2.1055859023), (-23.9121024484, -5.6976883507), (-20.32, -7.1855859023))
            Line((-20.32, -7.1855859023), (-25.4, -7.1855859023))
            Line((-25.4, -7.1855859023), (-25.4, -2.1055859023))
        make_face()
    extrude(amount=F3_T97_DEPTH)

    split(bisect_by=Plane.YZ.offset(-14.2886145411), keep=Keep.BOTTOM)


with BuildPart() as f1_18:
    add(f1_17.part)

    # F3_t94: cut F3_tool95
    add(f3_tool95.part, mode=Mode.SUBTRACT)


with BuildPart() as f3_tool100:
    # F3_s101 → F3_t102 (new body)
    with BuildSketch(Plane.YZ.offset(18.7313854589)):
        with BuildLine():
            ThreePointArc((0, 1.6654743419), (-1.4878975516, 5.2575767903), (-5.08, 6.7454743419))
            Line((-5.08, 6.7454743419), (0, 6.7454743419))
            Line((0, 6.7454743419), (0, 1.6654743419))
        make_face()
    extrude(amount=-F3_T102_DEPTH)

    split(bisect_by=Plane.YZ.offset(-14.2886145411), keep=Keep.BOTTOM)


with BuildPart() as f1_19:
    add(f1_18.part)

    # F3_t99: cut F3_tool100
    add(f3_tool100.part, mode=Mode.SUBTRACT)


with BuildPart() as f3_tool105:
    # F3_s106 → F3_t107 (new body)
    with BuildSketch(Plane.YZ.offset(-16.5944967519)):
        with BuildLine():
            ThreePointArc((0, -2.1055859023), (-1.4878975516, -5.6976883507), (-5.08, -7.1855859023))
            Line((-5.08, -7.1855859023), (0, -7.1855859023))
            Line((0, -7.1855859023), (0, -2.1055859023))
        make_face()
    extrude(amount=F3_T107_DEPTH)

    split(bisect_by=Plane.YZ.offset(-14.2886145411), keep=Keep.BOTTOM)


with BuildPart() as f1_20:
    add(f1_19.part)

    # F3_t104: cut F3_tool105
    add(f3_tool105.part, mode=Mode.SUBTRACT)


with BuildPart() as f3_tool110:
    # F3_s111 → F3_t112 (new body)
    with BuildSketch(Plane.YZ.offset(103.2470081498)):
        with BuildLine():
            ThreePointArc((0, 1.6654743419), (-1.4878975516, 5.2575767903), (-5.08, 6.7454743419))
            Line((-5.08, 6.7454743419), (0, 6.7454743419))
            Line((0, 6.7454743419), (0, 1.6654743419))
        make_face()
    extrude(amount=-F3_T112_DEPTH)

    split(bisect_by=Plane.YZ.offset(62.1176923599), keep=Keep.BOTTOM)


with BuildPart() as f1_21:
    add(f1_20.part)

    # F3_t109: cut F3_tool110
    add(f3_tool110.part, mode=Mode.SUBTRACT)


with BuildPart() as f3_tool115:
    # F3_s116 → F3_t117 (new body)
    with BuildSketch(Plane.YZ.offset(103.2470081498)):
        with BuildLine():
            ThreePointArc((-25.4, 1.6654743419), (-23.9121024484, 5.2575767903), (-20.32, 6.7454743419))
            Line((-20.32, 6.7454743419), (-25.4, 6.7454743419))
            Line((-25.4, 6.7454743419), (-25.4, 1.6654743419))
        make_face()
    extrude(amount=-F3_T117_DEPTH)

    split(bisect_by=Plane.YZ.offset(62.1176923599), keep=Keep.BOTTOM)


with BuildPart() as f1_22:
    add(f1_21.part)

    # F3_t114: cut F3_tool115
    add(f3_tool115.part, mode=Mode.SUBTRACT)


with BuildPart() as f3_tool120:
    # F3_s121 → F3_t122 (new body)
    with BuildSketch(Plane.YZ.offset(59.811810149)):
        with BuildLine():
            ThreePointArc((-25.4, -2.1055859023), (-23.9121024484, -5.6976883507), (-20.32, -7.1855859023))
            Line((-20.32, -7.1855859023), (-25.4, -7.1855859023))
            Line((-25.4, -7.1855859023), (-25.4, -2.1055859023))
        make_face()
    extrude(amount=F3_T122_DEPTH)

    split(bisect_by=Plane.YZ.offset(62.1176923599), keep=Keep.BOTTOM)


with BuildPart() as f1_23:
    add(f1_22.part)

    # F3_t119: cut F3_tool120
    add(f3_tool120.part, mode=Mode.SUBTRACT)


with BuildPart() as f3_tool125:
    # F3_s126 → F3_t127 (new body)
    with BuildSketch(Plane.YZ.offset(59.811810149)):
        with BuildLine():
            ThreePointArc((0, -2.1055859023), (-1.4878975516, -5.6976883507), (-5.08, -7.1855859023))
            Line((-5.08, -7.1855859023), (0, -7.1855859023))
            Line((0, -7.1855859023), (0, -2.1055859023))
        make_face()
    extrude(amount=F3_T127_DEPTH)

    split(bisect_by=Plane.YZ.offset(62.1176923599), keep=Keep.BOTTOM)


with BuildPart() as f1_24:
    add(f1_23.part)

    # F3_t124: cut F3_tool125
    add(f3_tool125.part, mode=Mode.SUBTRACT)


with BuildPart() as f3_tool130:
    # F3_s131 → F3_t132 (new body)
    with BuildSketch(Plane.YZ.offset(74.8176923599)):
        with BuildLine():
            ThreePointArc((0, 1.6654743419), (-1.4878975516, 5.2575767903), (-5.08, 6.7454743419))
            Line((-5.08, 6.7454743419), (0, 6.7454743419))
            Line((0, 6.7454743419), (0, 1.6654743419))
        make_face()
    extrude(amount=-F3_T132_DEPTH)

    split(bisect_by=Plane.YZ.offset(72.511810149), keep=Keep.TOP)


with BuildPart() as f1_25:
    add(f1_24.part)

    # F3_t129: cut F3_tool130
    add(f3_tool130.part, mode=Mode.SUBTRACT)


with BuildPart() as f3_tool135:
    # F3_s136 → F3_t137 (new body)
    with BuildSketch(Plane.YZ.offset(74.8176923599)):
        with BuildLine():
            ThreePointArc((-25.4, 1.6654743419), (-23.9121024484, 5.2575767903), (-20.32, 6.7454743419))
            Line((-20.32, 6.7454743419), (-25.4, 6.7454743419))
            Line((-25.4, 6.7454743419), (-25.4, 1.6654743419))
        make_face()
    extrude(amount=-F3_T137_DEPTH)

    split(bisect_by=Plane.YZ.offset(72.511810149), keep=Keep.TOP)


with BuildPart() as f1_26:
    add(f1_25.part)

    # F3_t134: cut F3_tool135
    add(f3_tool135.part, mode=Mode.SUBTRACT)


with BuildPart() as f3_tool140:
    # F3_s141 → F3_t142 (new body)
    with BuildSketch(Plane.YZ.offset(39.491810149)):
        with BuildLine():
            ThreePointArc((0, -2.1055859023), (-1.4878975516, -5.6976883507), (-5.08, -7.1855859023))
            Line((-5.08, -7.1855859023), (0, -7.1855859023))
            Line((0, -7.1855859023), (0, -2.1055859023))
        make_face()
    extrude(amount=F3_T142_DEPTH)

    split(bisect_by=Plane.YZ.offset(72.511810149), keep=Keep.TOP)


with BuildPart() as f1_27:
    add(f1_26.part)

    # F3_t139: cut F3_tool140
    add(f3_tool140.part, mode=Mode.SUBTRACT)


with BuildPart() as f3_tool145:
    # F3_s146 → F3_t147 (new body)
    with BuildSketch(Plane.YZ.offset(39.491810149)):
        with BuildLine():
            ThreePointArc((-25.4, -2.1055859023), (-23.9121024484, -5.6976883507), (-20.32, -7.1855859023))
            Line((-20.32, -7.1855859023), (-25.4, -7.1855859023))
            Line((-25.4, -7.1855859023), (-25.4, -2.1055859023))
        make_face()
    extrude(amount=F3_T147_DEPTH)

    split(bisect_by=Plane.YZ.offset(72.511810149), keep=Keep.TOP)


with BuildPart() as f1_28:
    add(f1_27.part)

    # F3_t144: cut F3_tool145
    add(f3_tool145.part, mode=Mode.SUBTRACT)


solid = f1_28.part
